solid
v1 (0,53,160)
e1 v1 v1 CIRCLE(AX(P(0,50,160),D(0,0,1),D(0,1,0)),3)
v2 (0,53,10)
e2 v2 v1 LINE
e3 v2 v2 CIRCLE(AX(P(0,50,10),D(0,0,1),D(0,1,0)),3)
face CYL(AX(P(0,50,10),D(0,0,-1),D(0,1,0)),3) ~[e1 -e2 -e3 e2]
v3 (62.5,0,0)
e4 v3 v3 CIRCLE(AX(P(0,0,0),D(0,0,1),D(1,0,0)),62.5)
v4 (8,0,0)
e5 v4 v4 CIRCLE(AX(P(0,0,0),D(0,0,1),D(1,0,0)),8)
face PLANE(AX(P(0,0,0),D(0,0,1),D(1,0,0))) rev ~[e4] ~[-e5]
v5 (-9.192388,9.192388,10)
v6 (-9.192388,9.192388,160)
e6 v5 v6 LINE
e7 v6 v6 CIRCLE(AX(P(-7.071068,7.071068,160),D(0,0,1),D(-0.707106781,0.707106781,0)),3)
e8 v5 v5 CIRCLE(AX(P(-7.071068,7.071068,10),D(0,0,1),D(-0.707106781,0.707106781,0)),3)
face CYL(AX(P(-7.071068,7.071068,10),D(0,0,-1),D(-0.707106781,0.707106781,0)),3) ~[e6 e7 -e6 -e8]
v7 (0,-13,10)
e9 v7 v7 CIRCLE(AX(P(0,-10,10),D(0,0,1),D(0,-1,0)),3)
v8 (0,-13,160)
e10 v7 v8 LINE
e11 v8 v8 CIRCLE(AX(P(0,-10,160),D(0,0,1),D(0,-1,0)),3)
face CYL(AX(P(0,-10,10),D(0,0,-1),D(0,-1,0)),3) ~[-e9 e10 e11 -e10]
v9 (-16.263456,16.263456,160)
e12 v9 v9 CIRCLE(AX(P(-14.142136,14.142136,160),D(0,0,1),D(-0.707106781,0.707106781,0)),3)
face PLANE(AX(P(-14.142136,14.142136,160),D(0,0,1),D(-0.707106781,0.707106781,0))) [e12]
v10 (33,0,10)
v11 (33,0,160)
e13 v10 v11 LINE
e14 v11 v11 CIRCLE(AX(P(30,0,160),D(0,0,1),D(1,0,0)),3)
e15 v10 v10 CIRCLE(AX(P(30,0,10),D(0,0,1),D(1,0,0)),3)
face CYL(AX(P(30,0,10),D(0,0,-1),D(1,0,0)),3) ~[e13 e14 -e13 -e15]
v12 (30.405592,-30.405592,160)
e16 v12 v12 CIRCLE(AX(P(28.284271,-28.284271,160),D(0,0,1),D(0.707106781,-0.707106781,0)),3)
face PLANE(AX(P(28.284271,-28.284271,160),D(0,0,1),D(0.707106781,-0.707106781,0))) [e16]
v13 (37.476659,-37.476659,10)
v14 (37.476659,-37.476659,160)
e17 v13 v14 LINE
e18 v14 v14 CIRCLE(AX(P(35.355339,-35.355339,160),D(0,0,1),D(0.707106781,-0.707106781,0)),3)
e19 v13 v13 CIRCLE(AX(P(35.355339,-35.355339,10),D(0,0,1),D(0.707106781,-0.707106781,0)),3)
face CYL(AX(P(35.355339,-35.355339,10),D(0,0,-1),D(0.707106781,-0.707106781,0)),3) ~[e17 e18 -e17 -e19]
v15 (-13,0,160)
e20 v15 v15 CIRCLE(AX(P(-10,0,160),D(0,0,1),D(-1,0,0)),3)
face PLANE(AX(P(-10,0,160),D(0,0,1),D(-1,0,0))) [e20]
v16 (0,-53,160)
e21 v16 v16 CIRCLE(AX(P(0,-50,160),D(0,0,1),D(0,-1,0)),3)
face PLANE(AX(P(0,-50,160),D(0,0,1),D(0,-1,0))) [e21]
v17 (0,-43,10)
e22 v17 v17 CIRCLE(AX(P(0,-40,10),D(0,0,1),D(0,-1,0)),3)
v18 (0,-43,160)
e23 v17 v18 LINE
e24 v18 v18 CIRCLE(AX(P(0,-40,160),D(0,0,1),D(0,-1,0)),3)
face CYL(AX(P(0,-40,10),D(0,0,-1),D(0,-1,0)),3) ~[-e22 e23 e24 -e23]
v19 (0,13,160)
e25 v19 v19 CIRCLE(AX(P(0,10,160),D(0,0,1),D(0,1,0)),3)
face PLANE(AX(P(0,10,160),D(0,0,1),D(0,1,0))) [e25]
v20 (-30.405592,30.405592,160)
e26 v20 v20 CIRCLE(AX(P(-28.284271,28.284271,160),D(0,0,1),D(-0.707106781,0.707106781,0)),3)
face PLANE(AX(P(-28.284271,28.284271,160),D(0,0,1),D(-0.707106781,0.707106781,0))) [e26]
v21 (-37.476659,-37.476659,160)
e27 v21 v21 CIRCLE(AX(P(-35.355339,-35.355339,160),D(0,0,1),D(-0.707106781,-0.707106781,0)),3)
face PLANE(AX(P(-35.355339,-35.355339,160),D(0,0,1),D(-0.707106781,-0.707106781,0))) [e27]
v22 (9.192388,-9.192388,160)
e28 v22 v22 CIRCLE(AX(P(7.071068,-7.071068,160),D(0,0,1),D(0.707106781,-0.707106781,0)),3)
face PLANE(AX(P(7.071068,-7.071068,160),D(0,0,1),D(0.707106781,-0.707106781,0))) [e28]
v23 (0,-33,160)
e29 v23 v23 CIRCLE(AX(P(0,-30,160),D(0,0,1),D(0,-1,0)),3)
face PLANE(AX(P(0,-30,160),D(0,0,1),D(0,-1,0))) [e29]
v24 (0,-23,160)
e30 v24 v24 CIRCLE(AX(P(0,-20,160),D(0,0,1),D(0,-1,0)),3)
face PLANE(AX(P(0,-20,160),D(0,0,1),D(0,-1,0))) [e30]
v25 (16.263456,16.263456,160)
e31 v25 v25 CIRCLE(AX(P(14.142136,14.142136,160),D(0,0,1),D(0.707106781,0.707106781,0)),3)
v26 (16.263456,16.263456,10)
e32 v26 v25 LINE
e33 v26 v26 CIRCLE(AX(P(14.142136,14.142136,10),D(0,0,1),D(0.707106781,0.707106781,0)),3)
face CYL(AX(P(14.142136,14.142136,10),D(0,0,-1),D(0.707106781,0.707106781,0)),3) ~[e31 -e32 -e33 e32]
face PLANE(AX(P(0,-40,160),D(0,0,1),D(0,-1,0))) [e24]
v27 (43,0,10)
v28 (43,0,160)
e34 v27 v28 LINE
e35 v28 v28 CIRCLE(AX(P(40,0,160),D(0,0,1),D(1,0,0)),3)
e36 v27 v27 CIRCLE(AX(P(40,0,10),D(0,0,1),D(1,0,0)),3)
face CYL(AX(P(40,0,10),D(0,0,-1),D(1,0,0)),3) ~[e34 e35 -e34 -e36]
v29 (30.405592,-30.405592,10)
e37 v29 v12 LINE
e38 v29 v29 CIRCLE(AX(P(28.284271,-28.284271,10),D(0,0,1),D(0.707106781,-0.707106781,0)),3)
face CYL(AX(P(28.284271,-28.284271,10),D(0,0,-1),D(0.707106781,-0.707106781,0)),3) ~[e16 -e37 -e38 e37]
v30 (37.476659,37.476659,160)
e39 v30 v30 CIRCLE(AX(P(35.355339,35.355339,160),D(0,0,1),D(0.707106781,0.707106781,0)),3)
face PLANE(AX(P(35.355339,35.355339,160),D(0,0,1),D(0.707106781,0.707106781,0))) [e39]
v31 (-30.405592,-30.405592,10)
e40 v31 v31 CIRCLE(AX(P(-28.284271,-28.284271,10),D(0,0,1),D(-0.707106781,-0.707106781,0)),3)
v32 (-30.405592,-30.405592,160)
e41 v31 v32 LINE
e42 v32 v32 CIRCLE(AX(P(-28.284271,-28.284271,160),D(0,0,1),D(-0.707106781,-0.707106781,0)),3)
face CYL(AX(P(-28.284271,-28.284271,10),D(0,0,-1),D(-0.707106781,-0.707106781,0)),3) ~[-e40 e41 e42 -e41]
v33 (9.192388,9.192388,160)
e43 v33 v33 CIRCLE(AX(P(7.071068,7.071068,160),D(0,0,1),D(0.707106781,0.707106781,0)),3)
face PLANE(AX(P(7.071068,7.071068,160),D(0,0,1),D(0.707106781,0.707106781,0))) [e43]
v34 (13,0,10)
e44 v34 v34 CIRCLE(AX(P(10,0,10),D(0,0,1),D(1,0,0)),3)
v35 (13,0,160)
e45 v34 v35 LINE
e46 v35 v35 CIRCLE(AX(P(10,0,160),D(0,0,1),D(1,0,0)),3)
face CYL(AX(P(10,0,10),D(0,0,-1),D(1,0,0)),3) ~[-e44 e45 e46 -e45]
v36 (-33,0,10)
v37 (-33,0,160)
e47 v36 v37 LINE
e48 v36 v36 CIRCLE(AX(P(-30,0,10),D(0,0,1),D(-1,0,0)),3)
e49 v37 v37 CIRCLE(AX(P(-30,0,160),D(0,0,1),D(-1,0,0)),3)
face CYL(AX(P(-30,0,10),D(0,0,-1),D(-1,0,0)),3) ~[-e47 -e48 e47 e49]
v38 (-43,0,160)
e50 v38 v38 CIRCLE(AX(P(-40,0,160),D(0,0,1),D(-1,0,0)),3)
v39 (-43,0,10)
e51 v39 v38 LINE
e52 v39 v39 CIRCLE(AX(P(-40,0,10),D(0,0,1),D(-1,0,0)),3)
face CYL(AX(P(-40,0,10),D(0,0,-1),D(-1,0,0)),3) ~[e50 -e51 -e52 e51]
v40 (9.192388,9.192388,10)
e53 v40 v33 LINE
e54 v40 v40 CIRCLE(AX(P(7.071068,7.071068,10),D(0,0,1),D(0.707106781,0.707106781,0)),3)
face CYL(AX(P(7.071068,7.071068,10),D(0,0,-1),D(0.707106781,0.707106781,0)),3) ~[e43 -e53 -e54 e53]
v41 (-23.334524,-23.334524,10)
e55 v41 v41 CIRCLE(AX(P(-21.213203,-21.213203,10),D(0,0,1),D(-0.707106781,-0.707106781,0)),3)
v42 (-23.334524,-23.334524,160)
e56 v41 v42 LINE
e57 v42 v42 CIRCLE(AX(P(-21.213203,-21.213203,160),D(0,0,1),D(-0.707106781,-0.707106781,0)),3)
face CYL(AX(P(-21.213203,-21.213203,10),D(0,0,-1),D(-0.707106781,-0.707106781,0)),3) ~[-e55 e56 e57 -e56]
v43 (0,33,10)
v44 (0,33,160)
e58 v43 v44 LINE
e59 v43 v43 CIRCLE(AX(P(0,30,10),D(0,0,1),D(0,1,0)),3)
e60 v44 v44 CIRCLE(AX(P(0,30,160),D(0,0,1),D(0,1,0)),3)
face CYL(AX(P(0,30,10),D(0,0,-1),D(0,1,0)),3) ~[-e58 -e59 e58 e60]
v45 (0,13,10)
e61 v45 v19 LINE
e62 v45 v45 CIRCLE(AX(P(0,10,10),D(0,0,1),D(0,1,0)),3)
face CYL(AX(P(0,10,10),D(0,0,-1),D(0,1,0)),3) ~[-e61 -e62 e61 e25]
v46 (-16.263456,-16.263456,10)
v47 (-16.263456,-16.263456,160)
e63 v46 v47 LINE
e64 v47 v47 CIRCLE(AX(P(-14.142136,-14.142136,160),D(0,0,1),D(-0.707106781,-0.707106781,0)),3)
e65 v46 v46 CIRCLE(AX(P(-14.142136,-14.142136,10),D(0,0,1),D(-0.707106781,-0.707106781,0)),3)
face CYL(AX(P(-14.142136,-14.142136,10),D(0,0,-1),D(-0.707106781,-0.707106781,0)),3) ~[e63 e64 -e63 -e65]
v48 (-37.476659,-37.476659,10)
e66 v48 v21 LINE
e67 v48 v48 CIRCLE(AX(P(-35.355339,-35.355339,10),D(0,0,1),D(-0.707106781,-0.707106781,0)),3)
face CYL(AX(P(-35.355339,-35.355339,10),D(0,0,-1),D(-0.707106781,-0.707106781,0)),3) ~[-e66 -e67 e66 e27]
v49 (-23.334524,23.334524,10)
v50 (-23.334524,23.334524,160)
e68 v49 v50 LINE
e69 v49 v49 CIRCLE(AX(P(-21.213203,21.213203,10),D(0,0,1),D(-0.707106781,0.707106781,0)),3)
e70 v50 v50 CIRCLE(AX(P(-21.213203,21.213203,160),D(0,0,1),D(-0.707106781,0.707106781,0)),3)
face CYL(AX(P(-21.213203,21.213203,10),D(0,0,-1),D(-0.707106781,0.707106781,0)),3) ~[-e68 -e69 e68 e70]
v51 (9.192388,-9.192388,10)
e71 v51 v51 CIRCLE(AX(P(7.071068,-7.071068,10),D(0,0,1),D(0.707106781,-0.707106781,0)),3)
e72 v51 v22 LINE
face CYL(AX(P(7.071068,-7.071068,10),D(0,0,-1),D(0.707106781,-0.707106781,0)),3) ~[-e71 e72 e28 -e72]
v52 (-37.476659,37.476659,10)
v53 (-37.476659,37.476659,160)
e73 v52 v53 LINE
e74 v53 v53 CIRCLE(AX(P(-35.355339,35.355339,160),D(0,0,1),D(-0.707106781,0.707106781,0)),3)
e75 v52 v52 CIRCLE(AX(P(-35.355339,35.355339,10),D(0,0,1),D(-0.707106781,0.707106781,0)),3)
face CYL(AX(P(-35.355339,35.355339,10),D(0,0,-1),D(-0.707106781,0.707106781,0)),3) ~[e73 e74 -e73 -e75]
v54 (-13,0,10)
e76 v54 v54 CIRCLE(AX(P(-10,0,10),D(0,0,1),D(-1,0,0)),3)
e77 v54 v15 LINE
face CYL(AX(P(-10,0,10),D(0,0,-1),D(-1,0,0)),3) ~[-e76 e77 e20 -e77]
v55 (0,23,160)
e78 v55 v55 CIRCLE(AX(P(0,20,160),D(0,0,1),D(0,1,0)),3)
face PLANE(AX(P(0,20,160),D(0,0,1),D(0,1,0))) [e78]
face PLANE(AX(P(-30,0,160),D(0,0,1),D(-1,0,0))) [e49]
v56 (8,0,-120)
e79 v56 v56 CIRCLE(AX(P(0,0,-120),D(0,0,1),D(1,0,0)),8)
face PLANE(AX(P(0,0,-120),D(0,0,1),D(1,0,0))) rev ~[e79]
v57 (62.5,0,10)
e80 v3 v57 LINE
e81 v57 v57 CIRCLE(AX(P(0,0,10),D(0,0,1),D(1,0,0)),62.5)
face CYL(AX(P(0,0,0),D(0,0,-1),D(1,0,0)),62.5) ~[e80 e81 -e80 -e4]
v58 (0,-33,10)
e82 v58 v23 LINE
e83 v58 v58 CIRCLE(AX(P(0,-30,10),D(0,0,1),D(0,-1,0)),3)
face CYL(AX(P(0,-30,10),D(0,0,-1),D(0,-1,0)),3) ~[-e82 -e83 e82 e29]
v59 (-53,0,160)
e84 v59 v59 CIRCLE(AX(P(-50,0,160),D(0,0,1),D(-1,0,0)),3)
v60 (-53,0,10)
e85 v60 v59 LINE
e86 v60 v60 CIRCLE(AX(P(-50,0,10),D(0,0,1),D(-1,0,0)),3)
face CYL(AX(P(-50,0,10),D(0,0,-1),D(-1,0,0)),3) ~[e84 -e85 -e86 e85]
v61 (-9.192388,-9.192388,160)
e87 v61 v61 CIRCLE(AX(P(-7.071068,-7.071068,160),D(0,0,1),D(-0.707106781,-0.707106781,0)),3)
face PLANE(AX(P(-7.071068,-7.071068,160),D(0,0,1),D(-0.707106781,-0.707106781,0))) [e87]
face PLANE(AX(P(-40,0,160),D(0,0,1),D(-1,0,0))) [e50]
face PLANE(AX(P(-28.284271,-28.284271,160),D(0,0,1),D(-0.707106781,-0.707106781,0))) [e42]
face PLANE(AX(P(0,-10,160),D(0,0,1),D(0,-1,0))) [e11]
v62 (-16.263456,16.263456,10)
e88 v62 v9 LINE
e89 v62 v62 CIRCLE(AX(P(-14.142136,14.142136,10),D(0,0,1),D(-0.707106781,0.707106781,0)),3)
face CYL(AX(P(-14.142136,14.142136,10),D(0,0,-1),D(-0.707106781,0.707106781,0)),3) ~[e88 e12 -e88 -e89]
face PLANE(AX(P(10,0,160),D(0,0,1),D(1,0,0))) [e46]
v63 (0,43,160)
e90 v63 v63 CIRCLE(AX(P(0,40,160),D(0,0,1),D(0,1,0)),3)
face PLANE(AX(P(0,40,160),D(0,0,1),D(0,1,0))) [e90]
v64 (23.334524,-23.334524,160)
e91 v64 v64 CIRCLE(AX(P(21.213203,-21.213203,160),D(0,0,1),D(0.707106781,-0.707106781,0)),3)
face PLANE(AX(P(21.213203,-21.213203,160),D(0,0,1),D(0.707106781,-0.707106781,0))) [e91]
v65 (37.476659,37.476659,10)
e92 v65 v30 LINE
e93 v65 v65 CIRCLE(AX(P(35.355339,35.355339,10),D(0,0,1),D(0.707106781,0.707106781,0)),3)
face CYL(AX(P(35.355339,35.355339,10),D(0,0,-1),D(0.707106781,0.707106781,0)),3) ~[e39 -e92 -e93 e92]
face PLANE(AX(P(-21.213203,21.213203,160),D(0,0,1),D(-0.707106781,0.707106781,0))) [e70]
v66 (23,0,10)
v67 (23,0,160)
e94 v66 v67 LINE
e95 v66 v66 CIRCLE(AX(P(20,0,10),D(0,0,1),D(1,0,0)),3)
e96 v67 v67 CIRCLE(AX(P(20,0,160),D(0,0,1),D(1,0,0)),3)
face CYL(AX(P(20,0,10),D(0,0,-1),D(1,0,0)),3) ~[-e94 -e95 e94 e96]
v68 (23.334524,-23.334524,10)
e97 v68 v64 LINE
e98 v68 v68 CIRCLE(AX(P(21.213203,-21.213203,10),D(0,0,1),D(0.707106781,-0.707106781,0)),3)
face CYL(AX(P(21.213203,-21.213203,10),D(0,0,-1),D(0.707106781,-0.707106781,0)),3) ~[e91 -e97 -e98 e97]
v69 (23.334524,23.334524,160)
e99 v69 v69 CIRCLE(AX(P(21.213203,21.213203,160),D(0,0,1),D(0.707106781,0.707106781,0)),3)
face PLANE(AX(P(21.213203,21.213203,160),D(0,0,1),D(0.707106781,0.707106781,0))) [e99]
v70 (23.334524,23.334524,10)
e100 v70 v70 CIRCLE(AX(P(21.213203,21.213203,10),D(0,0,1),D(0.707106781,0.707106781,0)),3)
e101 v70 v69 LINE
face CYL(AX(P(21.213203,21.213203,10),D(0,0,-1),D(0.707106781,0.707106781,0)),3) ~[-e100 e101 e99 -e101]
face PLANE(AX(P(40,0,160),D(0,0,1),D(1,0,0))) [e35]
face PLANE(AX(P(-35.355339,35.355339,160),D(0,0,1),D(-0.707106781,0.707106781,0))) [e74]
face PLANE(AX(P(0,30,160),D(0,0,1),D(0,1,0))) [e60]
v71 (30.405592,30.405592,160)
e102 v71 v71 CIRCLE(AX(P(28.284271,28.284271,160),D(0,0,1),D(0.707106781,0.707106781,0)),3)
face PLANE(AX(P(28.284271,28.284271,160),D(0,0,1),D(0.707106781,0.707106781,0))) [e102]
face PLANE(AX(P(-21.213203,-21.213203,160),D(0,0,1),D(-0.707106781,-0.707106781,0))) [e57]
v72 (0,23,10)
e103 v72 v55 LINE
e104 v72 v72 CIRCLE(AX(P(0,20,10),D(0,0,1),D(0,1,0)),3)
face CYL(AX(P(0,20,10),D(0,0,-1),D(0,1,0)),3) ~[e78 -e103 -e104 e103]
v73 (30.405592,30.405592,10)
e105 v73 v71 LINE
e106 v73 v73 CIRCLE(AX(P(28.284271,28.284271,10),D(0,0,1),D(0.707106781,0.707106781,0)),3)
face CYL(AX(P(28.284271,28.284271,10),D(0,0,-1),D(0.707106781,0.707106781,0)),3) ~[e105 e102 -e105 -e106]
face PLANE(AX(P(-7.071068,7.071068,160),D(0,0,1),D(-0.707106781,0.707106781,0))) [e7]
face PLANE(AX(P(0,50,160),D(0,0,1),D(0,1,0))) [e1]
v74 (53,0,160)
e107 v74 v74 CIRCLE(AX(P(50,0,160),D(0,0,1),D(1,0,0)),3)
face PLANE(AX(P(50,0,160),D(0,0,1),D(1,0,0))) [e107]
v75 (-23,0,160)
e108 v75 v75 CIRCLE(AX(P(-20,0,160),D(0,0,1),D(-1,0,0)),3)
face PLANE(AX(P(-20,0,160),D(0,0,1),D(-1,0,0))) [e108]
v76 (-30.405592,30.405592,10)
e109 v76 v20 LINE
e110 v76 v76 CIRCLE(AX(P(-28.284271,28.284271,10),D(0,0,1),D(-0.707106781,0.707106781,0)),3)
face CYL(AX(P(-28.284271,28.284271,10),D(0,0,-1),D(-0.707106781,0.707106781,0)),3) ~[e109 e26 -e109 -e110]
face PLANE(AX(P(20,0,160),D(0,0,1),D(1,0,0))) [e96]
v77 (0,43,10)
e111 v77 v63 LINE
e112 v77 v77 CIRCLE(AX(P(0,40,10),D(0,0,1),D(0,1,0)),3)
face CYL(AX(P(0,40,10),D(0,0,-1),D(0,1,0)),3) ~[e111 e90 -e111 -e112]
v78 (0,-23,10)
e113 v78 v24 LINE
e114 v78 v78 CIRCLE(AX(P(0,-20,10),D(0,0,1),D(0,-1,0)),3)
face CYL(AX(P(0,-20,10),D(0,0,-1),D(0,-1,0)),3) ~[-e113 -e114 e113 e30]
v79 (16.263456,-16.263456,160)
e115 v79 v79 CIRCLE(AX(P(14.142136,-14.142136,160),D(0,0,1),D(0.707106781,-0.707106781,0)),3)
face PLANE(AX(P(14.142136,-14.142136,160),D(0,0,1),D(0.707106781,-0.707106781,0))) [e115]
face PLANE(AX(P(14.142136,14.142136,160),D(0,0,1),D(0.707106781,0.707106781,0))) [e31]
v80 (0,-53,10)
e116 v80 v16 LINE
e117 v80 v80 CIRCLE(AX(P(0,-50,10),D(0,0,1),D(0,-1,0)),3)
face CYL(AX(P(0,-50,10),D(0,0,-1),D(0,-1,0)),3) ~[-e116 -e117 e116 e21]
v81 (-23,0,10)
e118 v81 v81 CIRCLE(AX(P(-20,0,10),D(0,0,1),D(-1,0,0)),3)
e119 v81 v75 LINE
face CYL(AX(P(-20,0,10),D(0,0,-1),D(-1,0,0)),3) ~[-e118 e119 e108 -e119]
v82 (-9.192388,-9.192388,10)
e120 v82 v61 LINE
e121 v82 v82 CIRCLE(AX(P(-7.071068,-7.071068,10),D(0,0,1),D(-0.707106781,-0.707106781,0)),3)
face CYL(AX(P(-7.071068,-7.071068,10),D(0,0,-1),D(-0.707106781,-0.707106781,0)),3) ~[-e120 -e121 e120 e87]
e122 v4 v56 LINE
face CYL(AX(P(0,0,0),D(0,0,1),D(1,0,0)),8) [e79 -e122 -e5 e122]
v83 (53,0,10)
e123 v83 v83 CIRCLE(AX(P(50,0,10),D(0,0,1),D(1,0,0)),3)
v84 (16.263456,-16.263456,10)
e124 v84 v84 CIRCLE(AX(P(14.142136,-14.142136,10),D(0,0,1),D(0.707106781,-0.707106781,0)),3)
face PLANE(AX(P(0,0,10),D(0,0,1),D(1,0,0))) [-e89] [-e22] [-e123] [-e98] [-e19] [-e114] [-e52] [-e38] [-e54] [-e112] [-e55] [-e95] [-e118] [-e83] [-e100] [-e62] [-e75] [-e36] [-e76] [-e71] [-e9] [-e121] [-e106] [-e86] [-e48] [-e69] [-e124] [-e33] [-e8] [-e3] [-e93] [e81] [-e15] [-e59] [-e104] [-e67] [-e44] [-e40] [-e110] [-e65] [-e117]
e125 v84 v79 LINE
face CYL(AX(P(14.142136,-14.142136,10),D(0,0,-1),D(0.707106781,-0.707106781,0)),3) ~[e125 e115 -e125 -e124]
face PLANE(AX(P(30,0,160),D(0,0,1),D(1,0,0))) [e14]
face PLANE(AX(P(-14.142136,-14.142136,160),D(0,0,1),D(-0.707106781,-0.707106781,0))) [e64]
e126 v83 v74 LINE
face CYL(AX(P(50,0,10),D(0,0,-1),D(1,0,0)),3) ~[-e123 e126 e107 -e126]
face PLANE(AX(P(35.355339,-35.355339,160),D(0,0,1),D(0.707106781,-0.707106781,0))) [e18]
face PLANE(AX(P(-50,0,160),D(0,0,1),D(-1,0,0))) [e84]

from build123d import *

# Parameters (mm, degrees)
F0_R            = 62.5
F1_DEPTH        = 10
F2_R            = 3
F3_DEPTH        = 150
F3_COPIES_COUNT = 8
F4_R            = 8
F5_DEPTH        = 120


# Not quite as in the source:
# - a pattern or mirror of a feature is missing from the dataset's text; its kind, count and spacing are read off the source's solid


with BuildPart() as f1:
    # F0 (on Top) → F1 (new body)
    with BuildSketch(Plane.XY):
        Circle(F0_R)
    extrude(amount=F1_DEPTH)

    # F2 (on face) → F3 (join)
    with BuildSketch(Plane.XY.offset(10)):
        with Locations((10, 0)):
            Circle(F2_R)
        with Locations((20, 0)):
            Circle(F2_R)
        with Locations((30, 0)):
            Circle(F2_R)
        with Locations((40, 0)):
            Circle(F2_R)
        with Locations((50, 0)):
            Circle(F2_R)
    f3 = extrude(amount=F3_DEPTH)

    # F3_copies: F3 ×8 about axis
    f3_copies_axis = Axis((0, 0, 0), (0, 0, 1))
    for i in range(1, F3_COPIES_COUNT):
        add(f3.rotate(f3_copies_axis, i * 360 / F3_COPIES_COUNT))

    # F4 (on face) → F5 (join)
    with BuildSketch(Plane.XY):
        Circle(F4_R)
    extrude(amount=-F5_DEPTH)


solid = f1.part
